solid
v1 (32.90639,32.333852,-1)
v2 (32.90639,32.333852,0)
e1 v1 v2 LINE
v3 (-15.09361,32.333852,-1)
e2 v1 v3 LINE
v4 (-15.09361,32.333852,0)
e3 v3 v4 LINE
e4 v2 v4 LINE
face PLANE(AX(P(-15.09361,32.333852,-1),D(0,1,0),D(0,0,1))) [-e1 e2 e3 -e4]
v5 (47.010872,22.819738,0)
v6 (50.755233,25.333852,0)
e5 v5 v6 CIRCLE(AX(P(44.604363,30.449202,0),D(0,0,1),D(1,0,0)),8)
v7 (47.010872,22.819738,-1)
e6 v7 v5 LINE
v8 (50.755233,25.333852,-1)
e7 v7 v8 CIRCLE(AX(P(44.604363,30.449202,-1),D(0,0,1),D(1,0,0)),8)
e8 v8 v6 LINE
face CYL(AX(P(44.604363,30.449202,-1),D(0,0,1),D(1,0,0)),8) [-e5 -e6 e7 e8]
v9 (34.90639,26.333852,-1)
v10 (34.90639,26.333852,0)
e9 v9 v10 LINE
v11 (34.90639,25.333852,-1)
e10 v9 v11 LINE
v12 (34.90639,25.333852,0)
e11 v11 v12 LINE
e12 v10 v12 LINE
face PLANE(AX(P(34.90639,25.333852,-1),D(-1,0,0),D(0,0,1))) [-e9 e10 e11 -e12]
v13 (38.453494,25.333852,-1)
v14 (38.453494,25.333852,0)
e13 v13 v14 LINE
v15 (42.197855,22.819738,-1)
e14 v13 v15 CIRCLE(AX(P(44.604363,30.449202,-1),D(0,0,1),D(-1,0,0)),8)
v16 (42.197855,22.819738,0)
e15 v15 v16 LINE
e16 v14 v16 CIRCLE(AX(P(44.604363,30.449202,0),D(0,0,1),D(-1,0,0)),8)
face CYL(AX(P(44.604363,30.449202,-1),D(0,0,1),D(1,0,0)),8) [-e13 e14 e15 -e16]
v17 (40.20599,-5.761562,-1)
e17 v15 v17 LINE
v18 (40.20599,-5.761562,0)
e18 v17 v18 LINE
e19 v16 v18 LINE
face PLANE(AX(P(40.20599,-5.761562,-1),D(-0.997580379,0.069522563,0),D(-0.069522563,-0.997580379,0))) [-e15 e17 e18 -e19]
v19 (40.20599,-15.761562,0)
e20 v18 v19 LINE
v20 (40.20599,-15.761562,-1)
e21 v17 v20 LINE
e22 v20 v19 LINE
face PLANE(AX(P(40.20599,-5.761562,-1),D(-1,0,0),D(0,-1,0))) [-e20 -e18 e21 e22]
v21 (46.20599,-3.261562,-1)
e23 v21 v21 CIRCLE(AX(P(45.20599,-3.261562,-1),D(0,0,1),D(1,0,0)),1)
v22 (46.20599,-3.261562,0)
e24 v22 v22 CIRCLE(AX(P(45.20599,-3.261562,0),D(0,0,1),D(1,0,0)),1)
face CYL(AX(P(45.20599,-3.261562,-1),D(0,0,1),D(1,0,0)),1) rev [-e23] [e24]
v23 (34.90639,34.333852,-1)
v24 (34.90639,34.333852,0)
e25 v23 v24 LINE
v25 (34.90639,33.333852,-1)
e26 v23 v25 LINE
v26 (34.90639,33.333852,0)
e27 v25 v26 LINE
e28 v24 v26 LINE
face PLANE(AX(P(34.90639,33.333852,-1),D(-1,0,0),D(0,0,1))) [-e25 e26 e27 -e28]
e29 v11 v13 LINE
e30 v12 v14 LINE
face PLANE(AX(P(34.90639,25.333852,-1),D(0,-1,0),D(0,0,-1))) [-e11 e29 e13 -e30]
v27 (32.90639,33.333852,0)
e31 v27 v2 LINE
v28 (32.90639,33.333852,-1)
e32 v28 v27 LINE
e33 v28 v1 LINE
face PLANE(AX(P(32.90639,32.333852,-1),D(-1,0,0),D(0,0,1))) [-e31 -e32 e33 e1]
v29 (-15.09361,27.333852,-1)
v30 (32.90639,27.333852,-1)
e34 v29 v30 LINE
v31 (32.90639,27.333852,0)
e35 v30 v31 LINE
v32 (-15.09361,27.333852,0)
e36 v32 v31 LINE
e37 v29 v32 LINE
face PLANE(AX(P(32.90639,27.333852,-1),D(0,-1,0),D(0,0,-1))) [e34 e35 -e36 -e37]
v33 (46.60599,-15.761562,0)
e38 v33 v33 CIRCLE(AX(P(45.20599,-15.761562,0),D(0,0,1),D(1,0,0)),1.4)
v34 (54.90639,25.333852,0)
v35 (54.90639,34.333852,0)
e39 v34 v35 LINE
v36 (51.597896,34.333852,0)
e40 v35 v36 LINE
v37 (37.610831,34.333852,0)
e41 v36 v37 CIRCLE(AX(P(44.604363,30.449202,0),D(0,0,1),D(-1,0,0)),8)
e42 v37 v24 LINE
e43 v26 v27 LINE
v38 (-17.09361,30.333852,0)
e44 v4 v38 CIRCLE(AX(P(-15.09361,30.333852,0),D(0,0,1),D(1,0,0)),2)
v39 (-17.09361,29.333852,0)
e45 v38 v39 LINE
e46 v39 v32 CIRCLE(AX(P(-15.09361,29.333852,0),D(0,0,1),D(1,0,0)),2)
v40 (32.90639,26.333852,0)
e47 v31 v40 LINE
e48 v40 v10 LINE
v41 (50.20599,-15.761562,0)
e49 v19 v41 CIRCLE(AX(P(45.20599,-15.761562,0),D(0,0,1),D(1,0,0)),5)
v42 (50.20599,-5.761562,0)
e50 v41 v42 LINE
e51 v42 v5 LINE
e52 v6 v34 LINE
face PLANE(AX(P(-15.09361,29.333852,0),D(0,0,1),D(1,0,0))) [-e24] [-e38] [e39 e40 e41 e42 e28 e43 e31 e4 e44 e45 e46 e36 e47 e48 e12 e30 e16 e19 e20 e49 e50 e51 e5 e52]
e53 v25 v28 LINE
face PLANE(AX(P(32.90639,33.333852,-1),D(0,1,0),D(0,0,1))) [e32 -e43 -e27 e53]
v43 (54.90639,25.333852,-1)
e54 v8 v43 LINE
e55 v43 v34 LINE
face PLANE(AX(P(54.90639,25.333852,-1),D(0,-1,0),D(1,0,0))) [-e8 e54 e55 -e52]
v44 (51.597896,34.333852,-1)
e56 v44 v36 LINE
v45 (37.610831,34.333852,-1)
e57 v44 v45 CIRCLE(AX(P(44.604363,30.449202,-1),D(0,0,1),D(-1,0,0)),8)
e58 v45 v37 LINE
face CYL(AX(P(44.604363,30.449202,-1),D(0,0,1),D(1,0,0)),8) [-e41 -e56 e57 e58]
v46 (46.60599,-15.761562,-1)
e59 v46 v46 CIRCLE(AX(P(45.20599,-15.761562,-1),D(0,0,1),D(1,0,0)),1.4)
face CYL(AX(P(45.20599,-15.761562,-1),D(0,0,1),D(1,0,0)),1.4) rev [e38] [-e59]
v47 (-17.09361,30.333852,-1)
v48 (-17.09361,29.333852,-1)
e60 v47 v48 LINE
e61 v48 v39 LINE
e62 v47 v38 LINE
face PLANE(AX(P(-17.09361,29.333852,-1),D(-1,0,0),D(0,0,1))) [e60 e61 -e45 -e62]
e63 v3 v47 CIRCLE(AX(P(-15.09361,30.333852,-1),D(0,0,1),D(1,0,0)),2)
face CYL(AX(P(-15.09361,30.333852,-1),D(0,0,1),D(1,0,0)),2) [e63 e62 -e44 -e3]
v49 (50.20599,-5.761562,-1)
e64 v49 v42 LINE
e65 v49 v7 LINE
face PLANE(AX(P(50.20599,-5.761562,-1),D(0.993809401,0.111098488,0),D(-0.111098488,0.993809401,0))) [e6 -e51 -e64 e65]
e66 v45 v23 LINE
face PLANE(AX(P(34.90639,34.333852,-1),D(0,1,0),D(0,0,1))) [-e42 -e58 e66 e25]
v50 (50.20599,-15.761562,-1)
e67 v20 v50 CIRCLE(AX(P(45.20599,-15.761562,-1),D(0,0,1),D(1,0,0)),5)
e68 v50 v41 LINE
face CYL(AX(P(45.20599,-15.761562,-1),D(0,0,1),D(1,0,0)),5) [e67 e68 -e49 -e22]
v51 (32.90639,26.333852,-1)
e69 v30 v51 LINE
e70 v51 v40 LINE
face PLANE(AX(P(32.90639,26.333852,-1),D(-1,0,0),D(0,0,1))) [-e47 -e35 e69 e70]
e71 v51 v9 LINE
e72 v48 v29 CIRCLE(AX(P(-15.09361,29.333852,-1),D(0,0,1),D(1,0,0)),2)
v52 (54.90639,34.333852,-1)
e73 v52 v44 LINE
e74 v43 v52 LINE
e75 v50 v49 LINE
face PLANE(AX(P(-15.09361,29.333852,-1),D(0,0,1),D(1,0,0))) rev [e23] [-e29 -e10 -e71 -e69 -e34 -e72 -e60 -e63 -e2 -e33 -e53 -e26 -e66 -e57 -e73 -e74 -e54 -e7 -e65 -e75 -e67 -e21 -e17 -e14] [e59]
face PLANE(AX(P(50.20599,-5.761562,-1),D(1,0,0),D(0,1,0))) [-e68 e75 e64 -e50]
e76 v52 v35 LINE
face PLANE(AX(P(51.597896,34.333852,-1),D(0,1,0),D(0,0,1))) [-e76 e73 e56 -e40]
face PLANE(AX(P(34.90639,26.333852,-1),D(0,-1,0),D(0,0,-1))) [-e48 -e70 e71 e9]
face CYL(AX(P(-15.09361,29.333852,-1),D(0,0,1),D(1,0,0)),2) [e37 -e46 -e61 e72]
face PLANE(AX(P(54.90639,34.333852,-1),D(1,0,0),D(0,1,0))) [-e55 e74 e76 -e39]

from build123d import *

# Parameters (mm, degrees)
MODEL_R           = 1.4
MODEL_R_2         = 1
BRIDA_BASE1_DEPTH = 1


# Sheet-metal steps are written as plain solids
with BuildPart() as part:
    # Model → Brida base1 (new body)
    with BuildSketch(Plane.XY):
        with BuildLine():
            Line((40.2059904, -5.7615616), (42.197855138, 22.819737764))
            ThreePointArc((42.197855138, 22.819737764), (40.144837503, 23.807467685), (38.45349381, 25.333851753))
            Line((38.45349381, 25.333851753), (34.906389557, 25.333851753))
            Line((34.906389557, 25.333851753), (34.906389557, 26.333851753))
            Line((34.906389557, 26.333851753), (32.906389557, 26.333851753))
            Line((32.906389557, 26.333851753), (32.906389557, 27.333851753))
            Line((32.906389557, 27.333851753), (-15.093610443, 27.333851753))
            ThreePointArc((-15.093610443, 27.333851753), (-16.507824005, 27.919638191), (-17.093610443, 29.333851753))
            Line((-17.093610443, 29.333851753), (-17.093610443, 30.333851753))
            ThreePointArc((-17.093610443, 30.333851753), (-16.507824005, 31.748065316), (-15.093610443, 32.333851753))
            Line((-15.093610443, 32.333851753), (32.906389557, 32.333851753))
            Line((32.906389557, 32.333851753), (32.906389557, 33.333851753))
            Line((32.906389557, 33.333851753), (34.906389557, 33.333851753))
            Line((34.906389557, 33.333851753), (34.906389557, 34.333851753))
            Line((34.906389557, 34.333851753), (37.610831115, 34.333851753))
            ThreePointArc((37.610831115, 34.333851753), (44.604363348, 38.449201588), (51.597895581, 34.333851753))
            Line((51.597895581, 34.333851753), (54.906389557, 34.333851753))
            Line((54.906389557, 34.333851753), (54.906389557, 25.333851753))
            Line((54.906389557, 25.333851753), (50.755232885, 25.333851753))
            ThreePointArc((50.755232885, 25.333851753), (49.063889193, 23.807467685), (47.010871557, 22.819737764))
            Line((47.010871557, 22.819737764), (50.2059904, -5.7615616))
            Line((50.2059904, -5.7615616), (50.2059904, -15.7615616))
            ThreePointArc((50.2059904, -15.7615616), (45.2059904, -20.7615616), (40.2059904, -15.7615616))
            Line((40.2059904, -15.7615616), (40.2059904, -5.7615616))
        make_face()
        with Locations((45.2059904, -15.7615616)):
            Circle(MODEL_R, mode=Mode.SUBTRACT)
        with Locations((45.2059904, -3.2615616)):
            Circle(MODEL_R_2, mode=Mode.SUBTRACT)
    extrude(amount=-BRIDA_BASE1_DEPTH)


solid = part.part
